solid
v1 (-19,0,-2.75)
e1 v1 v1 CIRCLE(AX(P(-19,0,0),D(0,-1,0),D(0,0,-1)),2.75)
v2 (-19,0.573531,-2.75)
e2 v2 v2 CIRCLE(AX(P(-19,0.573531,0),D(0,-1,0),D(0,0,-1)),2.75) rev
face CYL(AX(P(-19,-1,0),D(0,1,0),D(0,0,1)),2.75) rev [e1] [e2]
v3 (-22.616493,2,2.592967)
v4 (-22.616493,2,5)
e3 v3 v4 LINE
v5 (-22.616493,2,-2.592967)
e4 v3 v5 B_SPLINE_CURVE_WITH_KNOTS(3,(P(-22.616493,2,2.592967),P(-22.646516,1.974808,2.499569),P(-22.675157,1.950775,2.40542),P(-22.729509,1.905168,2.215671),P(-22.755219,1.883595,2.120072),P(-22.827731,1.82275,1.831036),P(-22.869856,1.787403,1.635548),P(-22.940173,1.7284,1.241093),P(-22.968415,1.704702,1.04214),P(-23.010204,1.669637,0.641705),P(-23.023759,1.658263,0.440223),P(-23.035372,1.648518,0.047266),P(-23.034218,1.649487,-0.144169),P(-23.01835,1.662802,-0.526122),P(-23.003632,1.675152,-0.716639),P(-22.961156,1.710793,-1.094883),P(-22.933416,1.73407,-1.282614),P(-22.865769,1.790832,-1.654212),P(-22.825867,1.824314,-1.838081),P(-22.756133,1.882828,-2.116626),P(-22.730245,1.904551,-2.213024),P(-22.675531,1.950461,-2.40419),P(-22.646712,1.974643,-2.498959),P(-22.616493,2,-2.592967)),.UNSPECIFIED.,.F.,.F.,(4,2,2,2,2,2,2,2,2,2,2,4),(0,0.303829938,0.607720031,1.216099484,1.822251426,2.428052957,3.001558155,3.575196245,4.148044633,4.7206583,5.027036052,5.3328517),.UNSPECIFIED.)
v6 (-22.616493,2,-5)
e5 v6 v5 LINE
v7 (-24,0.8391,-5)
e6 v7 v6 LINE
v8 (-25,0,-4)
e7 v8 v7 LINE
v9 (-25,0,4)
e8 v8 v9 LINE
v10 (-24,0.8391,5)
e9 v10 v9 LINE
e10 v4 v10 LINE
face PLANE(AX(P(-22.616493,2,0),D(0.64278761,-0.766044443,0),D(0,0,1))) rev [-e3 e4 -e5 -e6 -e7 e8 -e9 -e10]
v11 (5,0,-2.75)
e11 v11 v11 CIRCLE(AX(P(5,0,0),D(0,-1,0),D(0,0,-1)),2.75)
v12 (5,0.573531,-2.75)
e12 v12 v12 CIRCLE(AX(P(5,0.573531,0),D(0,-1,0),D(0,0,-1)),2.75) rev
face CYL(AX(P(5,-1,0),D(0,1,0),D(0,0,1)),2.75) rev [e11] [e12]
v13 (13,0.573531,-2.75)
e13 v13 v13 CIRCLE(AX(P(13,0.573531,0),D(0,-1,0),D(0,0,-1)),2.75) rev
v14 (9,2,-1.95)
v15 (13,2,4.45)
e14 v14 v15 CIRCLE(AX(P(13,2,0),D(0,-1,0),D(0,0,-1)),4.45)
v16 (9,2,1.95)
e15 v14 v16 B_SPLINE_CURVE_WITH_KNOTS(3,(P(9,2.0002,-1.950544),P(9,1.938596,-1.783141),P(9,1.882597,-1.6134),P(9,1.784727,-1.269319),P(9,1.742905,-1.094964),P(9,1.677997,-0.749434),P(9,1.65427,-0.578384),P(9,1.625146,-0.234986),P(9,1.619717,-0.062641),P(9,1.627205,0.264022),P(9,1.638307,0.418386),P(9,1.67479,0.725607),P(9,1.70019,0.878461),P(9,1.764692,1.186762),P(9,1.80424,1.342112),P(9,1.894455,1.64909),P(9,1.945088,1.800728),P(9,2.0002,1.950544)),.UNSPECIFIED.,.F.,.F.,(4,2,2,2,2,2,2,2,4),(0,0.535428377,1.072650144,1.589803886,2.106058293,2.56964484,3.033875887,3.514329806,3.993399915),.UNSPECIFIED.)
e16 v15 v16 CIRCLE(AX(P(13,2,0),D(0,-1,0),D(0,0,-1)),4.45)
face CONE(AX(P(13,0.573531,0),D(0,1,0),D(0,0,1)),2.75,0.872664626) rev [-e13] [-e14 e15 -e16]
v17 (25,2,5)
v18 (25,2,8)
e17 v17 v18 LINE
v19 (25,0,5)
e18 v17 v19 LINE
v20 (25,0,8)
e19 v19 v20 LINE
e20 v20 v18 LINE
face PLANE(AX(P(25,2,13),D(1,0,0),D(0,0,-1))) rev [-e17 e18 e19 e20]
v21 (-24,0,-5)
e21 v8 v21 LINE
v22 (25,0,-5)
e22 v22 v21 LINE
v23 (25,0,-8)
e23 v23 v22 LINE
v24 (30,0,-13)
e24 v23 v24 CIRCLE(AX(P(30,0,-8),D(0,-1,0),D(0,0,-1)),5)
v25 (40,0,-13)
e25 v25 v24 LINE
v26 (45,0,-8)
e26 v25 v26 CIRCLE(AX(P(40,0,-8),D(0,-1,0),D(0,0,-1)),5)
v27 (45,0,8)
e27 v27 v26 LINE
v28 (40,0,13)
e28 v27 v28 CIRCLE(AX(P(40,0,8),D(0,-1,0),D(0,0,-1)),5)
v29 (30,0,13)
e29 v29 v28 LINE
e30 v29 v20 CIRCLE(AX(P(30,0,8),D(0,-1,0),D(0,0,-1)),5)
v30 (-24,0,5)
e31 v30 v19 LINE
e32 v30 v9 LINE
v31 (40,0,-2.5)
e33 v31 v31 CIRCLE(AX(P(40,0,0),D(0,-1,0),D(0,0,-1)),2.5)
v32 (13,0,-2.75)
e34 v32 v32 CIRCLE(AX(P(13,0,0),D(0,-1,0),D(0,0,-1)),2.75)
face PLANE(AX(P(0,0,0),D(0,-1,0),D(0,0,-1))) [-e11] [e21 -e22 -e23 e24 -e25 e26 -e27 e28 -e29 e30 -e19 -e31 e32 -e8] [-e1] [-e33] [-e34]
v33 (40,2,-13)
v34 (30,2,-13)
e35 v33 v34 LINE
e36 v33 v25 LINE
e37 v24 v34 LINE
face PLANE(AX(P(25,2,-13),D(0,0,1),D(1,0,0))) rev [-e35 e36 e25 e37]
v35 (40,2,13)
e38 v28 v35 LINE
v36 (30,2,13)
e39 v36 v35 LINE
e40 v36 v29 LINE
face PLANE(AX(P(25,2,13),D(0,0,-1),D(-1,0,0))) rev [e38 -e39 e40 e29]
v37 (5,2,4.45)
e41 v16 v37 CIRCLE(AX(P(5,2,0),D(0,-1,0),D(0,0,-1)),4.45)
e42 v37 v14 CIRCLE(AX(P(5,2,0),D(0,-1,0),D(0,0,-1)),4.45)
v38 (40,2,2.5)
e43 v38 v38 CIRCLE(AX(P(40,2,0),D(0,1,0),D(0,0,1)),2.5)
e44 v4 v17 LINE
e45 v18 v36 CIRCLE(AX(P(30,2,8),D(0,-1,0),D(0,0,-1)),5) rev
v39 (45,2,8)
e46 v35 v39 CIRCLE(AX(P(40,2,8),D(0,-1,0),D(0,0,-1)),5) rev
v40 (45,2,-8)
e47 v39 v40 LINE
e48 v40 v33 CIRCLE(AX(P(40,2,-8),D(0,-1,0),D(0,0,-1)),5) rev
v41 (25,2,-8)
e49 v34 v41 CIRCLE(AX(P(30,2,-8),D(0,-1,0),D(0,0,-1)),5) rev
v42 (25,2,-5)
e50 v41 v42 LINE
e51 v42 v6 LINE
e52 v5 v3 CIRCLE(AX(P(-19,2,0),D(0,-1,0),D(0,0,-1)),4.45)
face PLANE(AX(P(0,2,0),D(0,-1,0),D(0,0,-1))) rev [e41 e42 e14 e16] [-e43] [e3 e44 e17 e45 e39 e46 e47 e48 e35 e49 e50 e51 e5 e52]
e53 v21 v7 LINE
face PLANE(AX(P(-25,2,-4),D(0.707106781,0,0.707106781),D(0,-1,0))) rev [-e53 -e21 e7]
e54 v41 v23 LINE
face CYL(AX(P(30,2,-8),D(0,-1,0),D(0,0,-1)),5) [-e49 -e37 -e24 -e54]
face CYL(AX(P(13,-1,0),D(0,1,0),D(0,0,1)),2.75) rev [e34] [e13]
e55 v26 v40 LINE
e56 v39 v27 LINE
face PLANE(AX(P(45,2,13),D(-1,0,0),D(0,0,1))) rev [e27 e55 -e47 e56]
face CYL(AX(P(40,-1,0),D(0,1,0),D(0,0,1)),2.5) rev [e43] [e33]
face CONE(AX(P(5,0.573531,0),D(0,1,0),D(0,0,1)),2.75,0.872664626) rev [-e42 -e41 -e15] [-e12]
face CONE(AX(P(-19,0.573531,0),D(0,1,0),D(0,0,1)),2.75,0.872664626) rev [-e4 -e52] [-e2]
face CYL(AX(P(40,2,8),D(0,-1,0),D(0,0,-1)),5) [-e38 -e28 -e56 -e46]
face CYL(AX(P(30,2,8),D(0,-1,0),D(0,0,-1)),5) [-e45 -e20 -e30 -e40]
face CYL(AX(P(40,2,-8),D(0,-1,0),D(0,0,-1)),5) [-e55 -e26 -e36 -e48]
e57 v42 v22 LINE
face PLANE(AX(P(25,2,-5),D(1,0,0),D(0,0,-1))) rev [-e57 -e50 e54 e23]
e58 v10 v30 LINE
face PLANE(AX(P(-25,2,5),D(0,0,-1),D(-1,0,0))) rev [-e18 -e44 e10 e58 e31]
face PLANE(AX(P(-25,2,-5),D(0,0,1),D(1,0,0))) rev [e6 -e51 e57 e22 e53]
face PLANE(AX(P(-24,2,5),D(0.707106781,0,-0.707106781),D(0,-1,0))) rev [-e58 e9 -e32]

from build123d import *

# Parameters (mm, degrees)
BOSS_EXTRUDE1_DEPTH = 2
CHAMFER1_SIZE       = 1
FILLET1_R           = 5
SKETCH2_R           = 2.5
CUT_EXTRUDE1_DEPTH  = 3
SKETCH3_R           = 2.75
CUT_EXTRUDE2_DEPTH  = 3
CHAMFER2_SIZE2      = 2.383507185
CHAMFER2_SIZE       = 2
CHAMFER3_SIZE       = 1.7
CHAMFER3_SIZE_2     = 1.426469373


# Some blends are built 0.0001 mm under size
with BuildPart() as part:
    # Sketch1 → Boss-Extrude1 (new body)
    with BuildSketch(Plane(origin=(0, 0, 0), x_dir=(1, 0, 0), z_dir=(0, 1, 0))):
        Polygon((25, 5), (25, 13), (45, 13), (45, -13), (25, -13), (25, -5), (-25, -5), (-25, 5), align=None)
    extrude(amount=BOSS_EXTRUDE1_DEPTH)

    # Chamfer1
    chamfer1_edges = [part.edges().sort_by_distance(p)[0] for p in [
        (-25, 1, 5),
        (-25, 1, -5),
    ]]
    chamfer(chamfer1_edges, length=CHAMFER1_SIZE)

    # Fillet1
    fillet1_edges = [part.edges().sort_by_distance(p)[0] for p in [
        (25, 1, -13),
        (45, 1, -13),
        (45, 1, 13),
        (25, 1, 13),
    ]]
    fillet(fillet1_edges, radius=FILLET1_R)

    # Sketch2 → Cut-Extrude1 (cut)
    with BuildSketch(Plane(origin=(0, 2, 0), x_dir=(1, 0, 0), z_dir=(0, 1, 0))):
        with Locations(Location((40, 0, 0), (0, 0, 270))):
            Circle(SKETCH2_R)
    extrude(amount=-CUT_EXTRUDE1_DEPTH, mode=Mode.SUBTRACT)

    # Sketch3 → Cut-Extrude2 (cut)
    with BuildSketch(Plane(origin=(0, 2, 0), x_dir=(1, 0, 0), z_dir=(0, 1, 0))):
        with Locations(Location((13, 0, 0), (0, 0, 270))):
            Circle(SKETCH3_R)
        with Locations(Location((5, 0, 0), (0, 0, 270))):
            Circle(SKETCH3_R)
        with Locations(Location((-19, 0, 0), (0, 0, 270))):
            Circle(SKETCH3_R)
    extrude(amount=-CUT_EXTRUDE2_DEPTH, mode=Mode.SUBTRACT)

    # Chamfer2
    chamfer2_edges = [part.edges().sort_by_distance(p)[0] for p in [
        (-25, 2, 0),
    ]]
    chamfer2_side = [part.faces().sort_by_distance(p)[0] for p in [
        (-25, 1.96, 0),
    ]]
    chamfer(chamfer2_edges, length=CHAMFER2_SIZE - 0.0001, length2=CHAMFER2_SIZE2 - 0.0001, reference=chamfer2_side[0])  # a hair under: the kernel refuses the full size

    # Chamfer3
    # the kernel refuses this chamfer: 1.7, 1.426469373 mm, written as the material it takes off along each edge
    with BuildSketch(Plane(origin=(13, 2, 0), x_dir=(0, 0, 1), z_dir=(-1, 0, 0))) as chamfer3_piece_1:
        Polygon((2.75 + CHAMFER3_SIZE, 0), (2.75, -CHAMFER3_SIZE_2), (2.75, 0), align=None)
    revolve(axis=Axis((13, 2, 0), (0, 1, 0)), mode=Mode.SUBTRACT)
    with BuildSketch(Plane(origin=(5, 2, 0), x_dir=(0, 0, 1), z_dir=(-1, 0, 0))) as chamfer3_piece_2:
        Polygon((2.75 + CHAMFER3_SIZE, 0), (2.75, -CHAMFER3_SIZE_2), (2.75, 0), align=None)
    revolve(axis=Axis((5, 2, 0), (0, 1, 0)), mode=Mode.SUBTRACT)
    with BuildSketch(Plane(origin=(-19, 2, 0), x_dir=(0, 0, 1), z_dir=(-1, 0, 0))) as chamfer3_piece_3:
        Polygon((2.75 + CHAMFER3_SIZE, 0), (2.75, -CHAMFER3_SIZE_2), (2.75, 0), align=None)
    revolve(axis=Axis((-19, 2, 0), (0, 1, 0)), mode=Mode.SUBTRACT)


solid = part.part
